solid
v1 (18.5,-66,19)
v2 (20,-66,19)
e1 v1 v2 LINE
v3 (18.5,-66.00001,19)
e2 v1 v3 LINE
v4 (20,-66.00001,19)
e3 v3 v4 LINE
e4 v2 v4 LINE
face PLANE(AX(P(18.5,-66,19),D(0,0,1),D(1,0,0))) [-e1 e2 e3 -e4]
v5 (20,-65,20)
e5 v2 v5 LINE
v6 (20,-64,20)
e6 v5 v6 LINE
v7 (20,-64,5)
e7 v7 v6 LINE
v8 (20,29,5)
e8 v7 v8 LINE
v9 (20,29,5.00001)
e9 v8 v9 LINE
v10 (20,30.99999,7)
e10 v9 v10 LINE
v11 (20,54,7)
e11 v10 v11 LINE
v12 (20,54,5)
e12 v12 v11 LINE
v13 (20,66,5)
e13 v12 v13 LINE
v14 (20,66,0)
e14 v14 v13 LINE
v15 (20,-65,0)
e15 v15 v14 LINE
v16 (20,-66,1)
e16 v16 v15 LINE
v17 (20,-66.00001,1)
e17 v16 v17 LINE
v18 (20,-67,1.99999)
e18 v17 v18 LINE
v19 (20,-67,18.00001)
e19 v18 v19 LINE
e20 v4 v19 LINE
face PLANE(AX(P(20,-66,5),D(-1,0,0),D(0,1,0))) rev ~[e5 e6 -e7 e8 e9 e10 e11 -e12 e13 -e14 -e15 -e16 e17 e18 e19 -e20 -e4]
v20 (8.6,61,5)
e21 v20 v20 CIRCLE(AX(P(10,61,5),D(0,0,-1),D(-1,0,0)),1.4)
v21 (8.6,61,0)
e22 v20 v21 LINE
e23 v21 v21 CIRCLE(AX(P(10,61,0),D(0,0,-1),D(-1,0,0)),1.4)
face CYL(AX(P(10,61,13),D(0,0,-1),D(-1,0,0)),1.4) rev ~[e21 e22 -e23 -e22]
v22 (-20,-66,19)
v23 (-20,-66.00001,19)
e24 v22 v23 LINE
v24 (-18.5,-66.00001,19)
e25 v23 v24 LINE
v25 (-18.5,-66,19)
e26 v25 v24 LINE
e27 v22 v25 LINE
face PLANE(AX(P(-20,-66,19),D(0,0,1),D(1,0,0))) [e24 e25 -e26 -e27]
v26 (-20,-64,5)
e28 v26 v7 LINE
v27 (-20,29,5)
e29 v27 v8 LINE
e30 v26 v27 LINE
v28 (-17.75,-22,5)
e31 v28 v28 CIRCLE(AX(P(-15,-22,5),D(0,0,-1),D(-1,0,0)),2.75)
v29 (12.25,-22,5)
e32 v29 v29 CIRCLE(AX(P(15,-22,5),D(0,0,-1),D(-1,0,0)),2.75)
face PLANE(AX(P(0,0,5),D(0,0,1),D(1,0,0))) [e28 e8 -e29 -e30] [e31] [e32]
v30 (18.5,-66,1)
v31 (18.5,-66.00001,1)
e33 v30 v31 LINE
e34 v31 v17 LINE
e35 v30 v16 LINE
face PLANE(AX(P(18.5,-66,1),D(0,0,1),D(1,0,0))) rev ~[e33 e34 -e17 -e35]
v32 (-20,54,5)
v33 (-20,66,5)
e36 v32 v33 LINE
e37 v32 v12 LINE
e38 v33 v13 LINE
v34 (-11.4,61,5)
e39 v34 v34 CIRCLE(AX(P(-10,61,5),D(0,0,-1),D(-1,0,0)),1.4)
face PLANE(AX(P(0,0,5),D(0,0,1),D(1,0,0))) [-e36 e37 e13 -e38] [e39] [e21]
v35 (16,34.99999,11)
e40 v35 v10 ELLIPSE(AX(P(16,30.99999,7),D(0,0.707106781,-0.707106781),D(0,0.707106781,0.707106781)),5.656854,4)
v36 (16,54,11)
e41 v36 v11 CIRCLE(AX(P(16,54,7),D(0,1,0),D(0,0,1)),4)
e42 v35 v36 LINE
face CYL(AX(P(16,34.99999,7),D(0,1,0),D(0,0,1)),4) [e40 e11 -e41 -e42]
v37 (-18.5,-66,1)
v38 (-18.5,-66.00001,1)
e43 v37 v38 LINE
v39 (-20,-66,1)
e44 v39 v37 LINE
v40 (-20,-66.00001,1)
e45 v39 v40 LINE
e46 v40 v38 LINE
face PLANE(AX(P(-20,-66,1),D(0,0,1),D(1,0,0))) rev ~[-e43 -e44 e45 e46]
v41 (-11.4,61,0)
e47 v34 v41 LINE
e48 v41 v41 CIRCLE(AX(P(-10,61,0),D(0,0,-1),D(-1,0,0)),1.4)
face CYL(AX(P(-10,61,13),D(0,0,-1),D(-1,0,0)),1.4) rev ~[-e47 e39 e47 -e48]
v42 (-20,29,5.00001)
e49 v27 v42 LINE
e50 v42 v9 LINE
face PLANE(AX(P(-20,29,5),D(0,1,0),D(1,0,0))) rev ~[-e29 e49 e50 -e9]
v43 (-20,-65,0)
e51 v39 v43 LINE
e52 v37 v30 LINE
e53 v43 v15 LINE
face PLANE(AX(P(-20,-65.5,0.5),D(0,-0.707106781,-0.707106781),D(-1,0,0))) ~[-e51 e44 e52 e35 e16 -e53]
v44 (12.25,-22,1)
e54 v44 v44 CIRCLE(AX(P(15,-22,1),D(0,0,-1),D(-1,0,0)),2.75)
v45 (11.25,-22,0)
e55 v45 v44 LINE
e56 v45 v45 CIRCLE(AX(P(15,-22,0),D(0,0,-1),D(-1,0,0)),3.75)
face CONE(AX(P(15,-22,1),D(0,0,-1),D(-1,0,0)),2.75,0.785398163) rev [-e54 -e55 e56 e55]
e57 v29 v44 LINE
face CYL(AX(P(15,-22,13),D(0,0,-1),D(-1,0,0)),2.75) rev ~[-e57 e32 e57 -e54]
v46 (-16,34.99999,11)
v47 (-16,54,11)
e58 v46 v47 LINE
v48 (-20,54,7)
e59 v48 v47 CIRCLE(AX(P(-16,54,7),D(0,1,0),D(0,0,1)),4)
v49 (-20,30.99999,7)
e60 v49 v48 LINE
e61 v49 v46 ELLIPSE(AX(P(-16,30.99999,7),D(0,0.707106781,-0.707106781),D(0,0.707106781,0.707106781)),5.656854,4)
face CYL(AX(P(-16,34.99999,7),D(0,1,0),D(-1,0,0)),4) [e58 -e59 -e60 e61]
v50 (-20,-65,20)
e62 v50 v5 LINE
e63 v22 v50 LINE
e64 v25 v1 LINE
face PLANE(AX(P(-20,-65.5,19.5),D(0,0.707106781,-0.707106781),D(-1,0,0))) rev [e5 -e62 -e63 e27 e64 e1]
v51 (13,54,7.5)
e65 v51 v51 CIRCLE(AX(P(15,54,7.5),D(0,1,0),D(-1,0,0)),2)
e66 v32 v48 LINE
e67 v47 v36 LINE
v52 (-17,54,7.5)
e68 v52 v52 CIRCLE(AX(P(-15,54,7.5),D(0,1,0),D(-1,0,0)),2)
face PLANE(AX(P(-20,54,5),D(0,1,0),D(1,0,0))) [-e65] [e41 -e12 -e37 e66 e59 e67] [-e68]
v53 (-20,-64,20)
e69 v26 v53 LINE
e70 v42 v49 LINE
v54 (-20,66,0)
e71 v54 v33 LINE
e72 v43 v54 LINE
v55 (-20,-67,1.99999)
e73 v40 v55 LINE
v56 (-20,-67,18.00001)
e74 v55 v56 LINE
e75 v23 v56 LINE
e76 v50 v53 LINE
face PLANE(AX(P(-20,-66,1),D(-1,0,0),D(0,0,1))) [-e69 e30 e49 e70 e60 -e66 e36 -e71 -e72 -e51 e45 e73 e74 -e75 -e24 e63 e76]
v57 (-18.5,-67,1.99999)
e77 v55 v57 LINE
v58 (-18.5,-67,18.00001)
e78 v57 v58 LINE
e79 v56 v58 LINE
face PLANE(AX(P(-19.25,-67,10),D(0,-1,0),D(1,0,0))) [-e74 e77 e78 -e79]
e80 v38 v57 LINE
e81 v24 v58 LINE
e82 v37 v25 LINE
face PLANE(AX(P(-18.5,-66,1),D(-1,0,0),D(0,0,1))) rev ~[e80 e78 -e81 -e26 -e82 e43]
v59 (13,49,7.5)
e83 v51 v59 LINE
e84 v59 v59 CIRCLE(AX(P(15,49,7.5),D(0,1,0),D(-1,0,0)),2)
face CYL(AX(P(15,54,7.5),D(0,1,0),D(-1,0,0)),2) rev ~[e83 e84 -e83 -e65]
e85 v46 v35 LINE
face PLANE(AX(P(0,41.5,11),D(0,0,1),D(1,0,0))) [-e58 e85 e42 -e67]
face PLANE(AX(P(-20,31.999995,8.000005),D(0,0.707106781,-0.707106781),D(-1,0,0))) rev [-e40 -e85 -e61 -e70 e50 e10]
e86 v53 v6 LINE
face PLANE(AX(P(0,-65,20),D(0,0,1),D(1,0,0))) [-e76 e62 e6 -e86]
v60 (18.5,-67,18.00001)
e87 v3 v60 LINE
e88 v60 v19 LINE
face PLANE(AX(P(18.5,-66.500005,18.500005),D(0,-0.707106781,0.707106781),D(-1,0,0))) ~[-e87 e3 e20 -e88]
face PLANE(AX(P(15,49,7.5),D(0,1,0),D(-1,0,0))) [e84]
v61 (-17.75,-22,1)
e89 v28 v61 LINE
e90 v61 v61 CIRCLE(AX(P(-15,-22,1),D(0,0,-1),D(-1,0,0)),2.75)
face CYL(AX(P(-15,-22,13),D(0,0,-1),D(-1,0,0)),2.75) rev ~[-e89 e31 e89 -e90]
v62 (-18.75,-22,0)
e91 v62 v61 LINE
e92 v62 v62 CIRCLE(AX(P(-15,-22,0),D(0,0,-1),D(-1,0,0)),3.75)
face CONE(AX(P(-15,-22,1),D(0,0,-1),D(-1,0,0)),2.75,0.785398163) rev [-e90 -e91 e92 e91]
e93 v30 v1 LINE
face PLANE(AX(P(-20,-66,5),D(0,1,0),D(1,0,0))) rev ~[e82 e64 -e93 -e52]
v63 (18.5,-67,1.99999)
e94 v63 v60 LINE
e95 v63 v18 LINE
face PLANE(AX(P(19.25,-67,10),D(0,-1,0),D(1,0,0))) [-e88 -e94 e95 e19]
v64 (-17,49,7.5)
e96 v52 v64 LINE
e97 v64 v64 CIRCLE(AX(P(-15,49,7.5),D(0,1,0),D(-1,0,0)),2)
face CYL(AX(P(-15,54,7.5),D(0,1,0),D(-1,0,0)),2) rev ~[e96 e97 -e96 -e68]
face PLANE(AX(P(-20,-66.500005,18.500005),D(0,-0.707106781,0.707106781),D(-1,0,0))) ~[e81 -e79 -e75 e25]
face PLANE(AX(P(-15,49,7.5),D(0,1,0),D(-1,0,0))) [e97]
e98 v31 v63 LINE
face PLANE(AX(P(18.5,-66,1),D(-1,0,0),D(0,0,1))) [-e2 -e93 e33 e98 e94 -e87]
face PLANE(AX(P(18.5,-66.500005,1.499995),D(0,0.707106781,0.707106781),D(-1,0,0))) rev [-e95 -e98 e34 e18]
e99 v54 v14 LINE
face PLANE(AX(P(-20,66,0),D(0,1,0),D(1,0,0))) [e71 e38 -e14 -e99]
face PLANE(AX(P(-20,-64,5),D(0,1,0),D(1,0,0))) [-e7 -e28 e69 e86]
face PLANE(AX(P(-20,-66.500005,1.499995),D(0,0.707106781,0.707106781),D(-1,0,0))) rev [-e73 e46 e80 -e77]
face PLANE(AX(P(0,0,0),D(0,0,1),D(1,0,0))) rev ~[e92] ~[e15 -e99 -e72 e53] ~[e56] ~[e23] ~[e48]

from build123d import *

# Parameters (mm, degrees)
F0_W      = 40
F0_H      = 131.9999998143
F1_DEPTH  = 5
F2_W      = 40
F2_H      = 2
F3_DEPTH  = 15
F4_D      = 5.5
F4_DEPTH  = 8
F4_TIP    = 1.6523667023
F5_SIZE   = 1
F6_W      = 40
F6_H      = 25
F7_DEPTH  = 6
F8_R      = 2
F9_DEPTH  = 5
F10_SIZE  = 5.99999
F11_R     = 4
F12_D     = 2.8
F12_DEPTH = 8
F12_TIP   = 0.8412048666
F13_W     = 1.5
F13_H     = 18
F14_DEPTH = 1
F15_SIZE  = 0.99999


# Not quite as in the source:
# - a fillet or chamfer is up to 0.001 mm smaller than in the source, because OpenCascade refuses the exact size


with BuildPart() as f1:
    # F0 (on Top) → F1 (new body)
    with BuildSketch(Plane.XY):
        with Locations((0, 9.28e-08)):
            Rectangle(F0_W, F0_H)
    extrude(amount=F1_DEPTH)

    # F2 (on face) → F3 (join)
    with BuildSketch(Plane.XY.offset(5)):
        with Locations((0, -64.9999998143)):
            Rectangle(F2_W, F2_H)
    extrude(amount=F3_DEPTH)

    # F4
    with Locations(Plane.XY.offset(5)):
        with Locations((-15, -21.9999998143), (15, -21.9999998143)):
            Hole(F4_D / 2, depth=F4_DEPTH)
            with Locations((0, 0, -(F4_DEPTH + F4_TIP / 2))):  # 118° drill point
                Cone(0, F4_D / 2, F4_TIP, mode=Mode.SUBTRACT)

    # F5
    f5_edges = [f1.edges().sort_by_distance(p)[0] for p in [
        (0, -66, 20),
        (0, -66, 0),
        (-17.75, -22, 0),
        (12.25, -22, 0),
    ]]
    chamfer(f5_edges, length=F5_SIZE)

    # F6 (on face) → F7 (join)
    with BuildSketch(Plane.XY.offset(5)):
        with Locations((0, 41.5)):
            Rectangle(F6_W, F6_H)
    extrude(amount=F7_DEPTH)

    # F8 (on face) → F9 (cut)
    with BuildSketch(Plane(origin=(0, 54, 0), x_dir=(-1, 0, 0), z_dir=(0, 1, 0))):
        with Locations((-15, 7.5)):
            Circle(F8_R)
        with Locations((15, 7.5)):
            Circle(F8_R)
    extrude(amount=-F9_DEPTH, mode=Mode.SUBTRACT)

    # F10 (size 6 in the source; OpenCascade refuses exactly that, so slightly less here)
    f10_edges = [f1.edges().sort_by_distance(p)[0] for p in [
        (0, 29, 11),
    ]]
    chamfer(f10_edges, length=F10_SIZE)

    # F11
    f11_edges = [f1.edges().sort_by_distance(p)[0] for p in [
        (-20, 44.499995, 11),
        (20, 44.499995, 11),
    ]]
    fillet(f11_edges, radius=F11_R)

    # F12
    with Locations(Plane.XY.offset(5)):
        with Locations((10, 61), (-10, 61)):
            Hole(F12_D / 2, depth=F12_DEPTH)
            with Locations((0, 0, -(F12_DEPTH + F12_TIP / 2))):  # 118° drill point
                Cone(0, F12_D / 2, F12_TIP, mode=Mode.SUBTRACT)

    # F13 (on face) → F14 (join)
    with BuildSketch(Plane.XZ.offset(65.9999998143)):
        with Locations((-19.25, 10)):
            Rectangle(F13_W, F13_H)
        with Locations((19.25, 10)):
            Rectangle(F13_W, F13_H)
    extrude(amount=F14_DEPTH)

    # F15 (size 1 in the source; OpenCascade refuses exactly that, so slightly less here)
    f15_edges = [f1.edges().sort_by_distance(p)[0] for p in [
        (-19.25, -67, 19),
        (-19.25, -67, 1),
        (19.25, -67, 19),
        (19.25, -67, 1),
    ]]
    chamfer(f15_edges, length=F15_SIZE)


solid = f1.part
